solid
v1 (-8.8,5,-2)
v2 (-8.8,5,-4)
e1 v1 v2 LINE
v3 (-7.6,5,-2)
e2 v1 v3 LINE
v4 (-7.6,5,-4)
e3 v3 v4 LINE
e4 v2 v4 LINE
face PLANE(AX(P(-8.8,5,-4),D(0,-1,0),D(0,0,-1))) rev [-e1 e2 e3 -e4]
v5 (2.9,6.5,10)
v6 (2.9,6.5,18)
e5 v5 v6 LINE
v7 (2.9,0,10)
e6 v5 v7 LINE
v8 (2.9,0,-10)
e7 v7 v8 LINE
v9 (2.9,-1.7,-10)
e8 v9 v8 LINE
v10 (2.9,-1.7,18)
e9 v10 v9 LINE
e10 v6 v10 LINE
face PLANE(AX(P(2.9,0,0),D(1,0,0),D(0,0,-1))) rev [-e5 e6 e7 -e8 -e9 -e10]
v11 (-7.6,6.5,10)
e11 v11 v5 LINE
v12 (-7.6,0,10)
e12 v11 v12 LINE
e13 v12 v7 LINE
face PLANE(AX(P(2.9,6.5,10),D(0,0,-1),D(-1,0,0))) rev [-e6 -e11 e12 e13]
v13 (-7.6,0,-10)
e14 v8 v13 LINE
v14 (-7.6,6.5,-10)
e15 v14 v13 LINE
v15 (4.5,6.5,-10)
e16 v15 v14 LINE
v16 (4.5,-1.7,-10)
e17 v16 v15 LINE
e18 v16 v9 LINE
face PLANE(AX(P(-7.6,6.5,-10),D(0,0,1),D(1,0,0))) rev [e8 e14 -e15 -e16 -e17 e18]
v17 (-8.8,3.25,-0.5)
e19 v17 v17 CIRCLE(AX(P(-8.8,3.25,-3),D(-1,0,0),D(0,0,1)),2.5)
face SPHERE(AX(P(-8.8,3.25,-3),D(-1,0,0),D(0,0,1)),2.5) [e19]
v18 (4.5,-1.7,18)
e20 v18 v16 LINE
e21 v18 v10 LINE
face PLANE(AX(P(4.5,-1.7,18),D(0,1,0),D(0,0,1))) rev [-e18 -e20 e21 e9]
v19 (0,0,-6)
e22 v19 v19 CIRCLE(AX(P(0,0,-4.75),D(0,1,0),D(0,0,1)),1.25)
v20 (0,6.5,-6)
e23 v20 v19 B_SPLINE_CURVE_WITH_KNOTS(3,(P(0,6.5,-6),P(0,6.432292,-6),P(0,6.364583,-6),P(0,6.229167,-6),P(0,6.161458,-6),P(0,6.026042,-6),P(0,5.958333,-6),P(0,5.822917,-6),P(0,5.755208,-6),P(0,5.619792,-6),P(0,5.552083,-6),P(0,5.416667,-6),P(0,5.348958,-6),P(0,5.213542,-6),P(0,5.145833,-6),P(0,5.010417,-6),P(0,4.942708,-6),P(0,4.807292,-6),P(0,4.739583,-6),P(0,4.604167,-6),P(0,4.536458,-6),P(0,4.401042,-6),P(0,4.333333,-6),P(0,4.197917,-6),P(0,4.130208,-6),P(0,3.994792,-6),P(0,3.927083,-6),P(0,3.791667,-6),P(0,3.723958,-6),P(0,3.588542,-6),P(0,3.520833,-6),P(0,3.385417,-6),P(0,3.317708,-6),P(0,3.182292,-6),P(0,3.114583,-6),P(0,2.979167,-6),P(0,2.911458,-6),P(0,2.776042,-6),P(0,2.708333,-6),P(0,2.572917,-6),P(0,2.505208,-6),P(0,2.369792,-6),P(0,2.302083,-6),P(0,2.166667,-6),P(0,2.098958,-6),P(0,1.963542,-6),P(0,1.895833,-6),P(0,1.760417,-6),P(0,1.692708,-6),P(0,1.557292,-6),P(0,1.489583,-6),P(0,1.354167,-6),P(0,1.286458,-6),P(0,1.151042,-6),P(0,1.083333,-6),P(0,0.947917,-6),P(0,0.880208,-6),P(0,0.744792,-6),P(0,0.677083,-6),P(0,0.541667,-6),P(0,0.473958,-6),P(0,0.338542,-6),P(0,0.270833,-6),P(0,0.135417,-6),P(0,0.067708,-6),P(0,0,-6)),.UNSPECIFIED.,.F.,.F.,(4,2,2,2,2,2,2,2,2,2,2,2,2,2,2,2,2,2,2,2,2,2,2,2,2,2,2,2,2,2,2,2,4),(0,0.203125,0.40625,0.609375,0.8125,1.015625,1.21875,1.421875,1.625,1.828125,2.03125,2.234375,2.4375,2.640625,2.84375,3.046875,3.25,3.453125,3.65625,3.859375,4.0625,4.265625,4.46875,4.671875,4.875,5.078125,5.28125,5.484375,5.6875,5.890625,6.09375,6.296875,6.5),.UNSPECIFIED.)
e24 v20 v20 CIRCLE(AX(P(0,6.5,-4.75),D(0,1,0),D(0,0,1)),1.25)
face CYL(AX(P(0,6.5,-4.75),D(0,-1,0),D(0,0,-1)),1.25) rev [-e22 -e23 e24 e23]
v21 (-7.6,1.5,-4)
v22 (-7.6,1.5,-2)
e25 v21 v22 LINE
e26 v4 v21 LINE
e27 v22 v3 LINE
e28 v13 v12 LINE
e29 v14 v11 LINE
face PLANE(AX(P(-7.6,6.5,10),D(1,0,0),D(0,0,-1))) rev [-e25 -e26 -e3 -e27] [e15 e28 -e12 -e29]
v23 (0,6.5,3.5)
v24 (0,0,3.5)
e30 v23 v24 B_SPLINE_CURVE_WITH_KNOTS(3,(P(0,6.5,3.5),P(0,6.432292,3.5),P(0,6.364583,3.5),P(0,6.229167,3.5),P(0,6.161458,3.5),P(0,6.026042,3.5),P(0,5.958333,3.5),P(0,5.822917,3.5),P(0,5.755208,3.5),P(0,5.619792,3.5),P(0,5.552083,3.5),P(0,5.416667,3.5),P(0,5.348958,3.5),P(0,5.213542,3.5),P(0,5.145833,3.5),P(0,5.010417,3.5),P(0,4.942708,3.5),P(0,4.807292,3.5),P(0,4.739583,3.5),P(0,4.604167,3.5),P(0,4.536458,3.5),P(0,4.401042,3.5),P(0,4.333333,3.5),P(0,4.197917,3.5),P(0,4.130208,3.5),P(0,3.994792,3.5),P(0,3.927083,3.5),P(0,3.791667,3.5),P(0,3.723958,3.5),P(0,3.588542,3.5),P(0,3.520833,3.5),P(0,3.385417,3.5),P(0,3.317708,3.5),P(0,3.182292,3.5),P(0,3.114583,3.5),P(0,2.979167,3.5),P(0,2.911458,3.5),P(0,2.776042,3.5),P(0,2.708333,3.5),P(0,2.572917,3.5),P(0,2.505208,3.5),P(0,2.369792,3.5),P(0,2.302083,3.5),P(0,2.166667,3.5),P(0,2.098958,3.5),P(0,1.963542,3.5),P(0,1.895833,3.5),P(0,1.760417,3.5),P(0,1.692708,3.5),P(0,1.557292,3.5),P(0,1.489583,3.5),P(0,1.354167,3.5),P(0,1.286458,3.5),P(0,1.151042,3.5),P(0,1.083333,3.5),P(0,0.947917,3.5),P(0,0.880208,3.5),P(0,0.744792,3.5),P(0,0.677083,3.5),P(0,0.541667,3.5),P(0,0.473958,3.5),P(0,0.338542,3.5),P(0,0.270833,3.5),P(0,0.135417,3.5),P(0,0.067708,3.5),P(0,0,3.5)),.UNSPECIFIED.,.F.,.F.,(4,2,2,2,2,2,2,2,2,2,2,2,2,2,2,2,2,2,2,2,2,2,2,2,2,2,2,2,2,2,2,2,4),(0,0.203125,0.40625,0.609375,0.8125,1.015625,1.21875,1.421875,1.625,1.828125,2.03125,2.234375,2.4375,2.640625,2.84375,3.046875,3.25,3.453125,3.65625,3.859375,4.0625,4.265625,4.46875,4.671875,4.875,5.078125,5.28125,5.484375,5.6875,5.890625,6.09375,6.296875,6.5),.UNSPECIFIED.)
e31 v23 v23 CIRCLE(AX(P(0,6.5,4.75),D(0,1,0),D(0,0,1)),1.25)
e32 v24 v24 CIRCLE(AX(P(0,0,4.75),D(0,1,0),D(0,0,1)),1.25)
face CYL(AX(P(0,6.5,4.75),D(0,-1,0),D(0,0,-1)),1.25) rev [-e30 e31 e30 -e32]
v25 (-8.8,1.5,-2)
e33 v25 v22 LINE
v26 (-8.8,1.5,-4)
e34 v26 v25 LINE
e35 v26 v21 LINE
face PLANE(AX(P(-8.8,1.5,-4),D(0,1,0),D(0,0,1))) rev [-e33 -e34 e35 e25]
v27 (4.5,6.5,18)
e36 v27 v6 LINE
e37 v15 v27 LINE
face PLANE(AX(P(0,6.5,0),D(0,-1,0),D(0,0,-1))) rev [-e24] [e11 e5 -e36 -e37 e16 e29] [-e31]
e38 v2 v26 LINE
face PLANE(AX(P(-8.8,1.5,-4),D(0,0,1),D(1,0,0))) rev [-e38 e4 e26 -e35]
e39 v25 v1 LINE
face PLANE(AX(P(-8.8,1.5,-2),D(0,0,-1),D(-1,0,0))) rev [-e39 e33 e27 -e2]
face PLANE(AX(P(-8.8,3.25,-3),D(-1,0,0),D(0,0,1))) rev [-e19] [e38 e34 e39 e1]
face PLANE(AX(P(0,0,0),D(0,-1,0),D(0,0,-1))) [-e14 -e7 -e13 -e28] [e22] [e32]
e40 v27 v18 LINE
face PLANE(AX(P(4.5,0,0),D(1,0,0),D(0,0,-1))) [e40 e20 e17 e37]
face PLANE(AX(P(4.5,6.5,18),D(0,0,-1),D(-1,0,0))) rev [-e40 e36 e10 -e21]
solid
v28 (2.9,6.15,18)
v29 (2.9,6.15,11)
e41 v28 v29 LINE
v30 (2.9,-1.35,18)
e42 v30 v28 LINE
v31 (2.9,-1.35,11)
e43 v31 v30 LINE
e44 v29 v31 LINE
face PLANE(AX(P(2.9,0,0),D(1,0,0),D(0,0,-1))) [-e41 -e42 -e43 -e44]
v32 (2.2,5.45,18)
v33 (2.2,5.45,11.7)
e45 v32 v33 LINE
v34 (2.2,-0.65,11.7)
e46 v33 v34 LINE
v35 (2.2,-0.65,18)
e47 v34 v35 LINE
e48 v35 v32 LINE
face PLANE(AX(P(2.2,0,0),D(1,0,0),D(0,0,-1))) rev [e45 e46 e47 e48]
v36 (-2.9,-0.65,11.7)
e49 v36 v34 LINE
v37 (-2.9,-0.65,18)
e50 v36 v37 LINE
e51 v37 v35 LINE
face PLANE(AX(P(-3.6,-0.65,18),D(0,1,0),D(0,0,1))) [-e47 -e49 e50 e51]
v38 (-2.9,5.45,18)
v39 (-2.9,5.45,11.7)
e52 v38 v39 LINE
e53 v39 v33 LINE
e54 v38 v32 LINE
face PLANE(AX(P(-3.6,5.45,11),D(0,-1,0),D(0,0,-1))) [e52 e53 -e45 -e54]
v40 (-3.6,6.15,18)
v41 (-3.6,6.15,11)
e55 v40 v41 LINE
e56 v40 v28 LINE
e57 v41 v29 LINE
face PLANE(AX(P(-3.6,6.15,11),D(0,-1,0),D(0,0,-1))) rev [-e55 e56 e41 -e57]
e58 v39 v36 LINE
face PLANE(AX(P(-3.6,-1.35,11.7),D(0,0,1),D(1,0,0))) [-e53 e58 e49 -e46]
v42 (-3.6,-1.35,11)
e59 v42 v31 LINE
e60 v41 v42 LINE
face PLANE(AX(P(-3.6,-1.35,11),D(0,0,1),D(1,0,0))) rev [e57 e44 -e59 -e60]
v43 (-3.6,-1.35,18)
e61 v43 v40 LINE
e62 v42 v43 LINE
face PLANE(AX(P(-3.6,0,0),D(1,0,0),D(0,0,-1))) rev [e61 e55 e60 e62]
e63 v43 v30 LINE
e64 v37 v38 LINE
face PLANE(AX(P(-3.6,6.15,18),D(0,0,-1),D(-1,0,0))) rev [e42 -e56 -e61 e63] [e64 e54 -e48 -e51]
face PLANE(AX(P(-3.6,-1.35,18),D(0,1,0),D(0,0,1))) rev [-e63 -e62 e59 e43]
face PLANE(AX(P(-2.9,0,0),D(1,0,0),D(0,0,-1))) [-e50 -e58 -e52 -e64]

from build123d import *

# Parameters (mm, degrees)
SKETCH_1_W      = 10.5
SKETCH_1_H      = 20
SKETCH_1_R      = 1.25
EXTRUDE_1_DEPTH = 6.5
SKETCH_2_W      = 2
SKETCH_2_H      = 3.5
EXTRUDE_2_DEPTH = 1.2
SKETCH_3_R      = 2.5
EXTRUDE_3_DEPTH = 2.5
FILLET_1_R      = 2.5
SKETCH_4_W      = 28
SKETCH_4_H      = 8.2
EXTRUDE_4_DEPTH = 1.6
SKETCH_5_W      = 7
SKETCH_5_H      = 7.5
EXTRUDE_5_DEPTH = 6.5
SHELL_1_T       = -0.7


with BuildPart() as part:
    # 草图1 → 凸台-拉伸1 (new body)
    with BuildSketch(Plane(origin=(0, 0, 0), x_dir=(1, 0, 0), z_dir=(0, 1, 0))):
        with Locations((-2.35, 0)):
            Rectangle(SKETCH_1_W, SKETCH_1_H)
        with Locations(Location((0, 4.75, 0), (0, 0, 90))):
            Circle(SKETCH_1_R, mode=Mode.SUBTRACT)
        with Locations(Location((0, -4.75, 0), (0, 0, 90))):
            Circle(SKETCH_1_R, mode=Mode.SUBTRACT)
    extrude(amount=EXTRUDE_1_DEPTH)

    # 草图2 → 凸台-拉伸2 (add)
    with BuildSketch(Plane.ZY.offset(7.6)):
        with Locations((-3, 3.25)):
            Rectangle(SKETCH_2_W, SKETCH_2_H)
    extrude(amount=EXTRUDE_2_DEPTH)

    # 草图3 → 凸台-拉伸3 (add)
    with BuildSketch(Plane.ZY.offset(8.8)):
        with Locations((-3, 3.25)):
            Circle(SKETCH_3_R)
    extrude(amount=EXTRUDE_3_DEPTH)

    # 圆角1
    fillet_1_edges = [part.edges().sort_by_distance(p)[0] for p in [
        (-11.3, 3.25, -5.5),
    ]]
    fillet(fillet_1_edges, radius=FILLET_1_R - 0.0001)  # a hair under: the kernel refuses the full size

    # 草图4 → 凸台-拉伸4 (add)
    with BuildSketch(Plane(origin=(2.9, 0, 0), x_dir=(0, 0, -1), z_dir=(1, 0, 0))):
        with Locations((-4, 2.4)):
            Rectangle(SKETCH_4_W, SKETCH_4_H)
    extrude(amount=EXTRUDE_4_DEPTH)


with BuildPart() as body_2:
    # 草图5 → 凸台-拉伸5 (new body)
    with BuildSketch(Plane.ZY.offset(-2.9)):
        with Locations((14.5, 2.4)):
            Rectangle(SKETCH_5_W, SKETCH_5_H)
    extrude(amount=EXTRUDE_5_DEPTH)

    # 抽壳1
    shell_1_openings = [body_2.faces().sort_by_distance(p)[0] for p in [
        (-0.35, 2.4, 18),
    ]]
    offset(amount=SHELL_1_T, openings=shell_1_openings, kind=Kind.INTERSECTION)


solid = Compound([part.part, body_2.part])
